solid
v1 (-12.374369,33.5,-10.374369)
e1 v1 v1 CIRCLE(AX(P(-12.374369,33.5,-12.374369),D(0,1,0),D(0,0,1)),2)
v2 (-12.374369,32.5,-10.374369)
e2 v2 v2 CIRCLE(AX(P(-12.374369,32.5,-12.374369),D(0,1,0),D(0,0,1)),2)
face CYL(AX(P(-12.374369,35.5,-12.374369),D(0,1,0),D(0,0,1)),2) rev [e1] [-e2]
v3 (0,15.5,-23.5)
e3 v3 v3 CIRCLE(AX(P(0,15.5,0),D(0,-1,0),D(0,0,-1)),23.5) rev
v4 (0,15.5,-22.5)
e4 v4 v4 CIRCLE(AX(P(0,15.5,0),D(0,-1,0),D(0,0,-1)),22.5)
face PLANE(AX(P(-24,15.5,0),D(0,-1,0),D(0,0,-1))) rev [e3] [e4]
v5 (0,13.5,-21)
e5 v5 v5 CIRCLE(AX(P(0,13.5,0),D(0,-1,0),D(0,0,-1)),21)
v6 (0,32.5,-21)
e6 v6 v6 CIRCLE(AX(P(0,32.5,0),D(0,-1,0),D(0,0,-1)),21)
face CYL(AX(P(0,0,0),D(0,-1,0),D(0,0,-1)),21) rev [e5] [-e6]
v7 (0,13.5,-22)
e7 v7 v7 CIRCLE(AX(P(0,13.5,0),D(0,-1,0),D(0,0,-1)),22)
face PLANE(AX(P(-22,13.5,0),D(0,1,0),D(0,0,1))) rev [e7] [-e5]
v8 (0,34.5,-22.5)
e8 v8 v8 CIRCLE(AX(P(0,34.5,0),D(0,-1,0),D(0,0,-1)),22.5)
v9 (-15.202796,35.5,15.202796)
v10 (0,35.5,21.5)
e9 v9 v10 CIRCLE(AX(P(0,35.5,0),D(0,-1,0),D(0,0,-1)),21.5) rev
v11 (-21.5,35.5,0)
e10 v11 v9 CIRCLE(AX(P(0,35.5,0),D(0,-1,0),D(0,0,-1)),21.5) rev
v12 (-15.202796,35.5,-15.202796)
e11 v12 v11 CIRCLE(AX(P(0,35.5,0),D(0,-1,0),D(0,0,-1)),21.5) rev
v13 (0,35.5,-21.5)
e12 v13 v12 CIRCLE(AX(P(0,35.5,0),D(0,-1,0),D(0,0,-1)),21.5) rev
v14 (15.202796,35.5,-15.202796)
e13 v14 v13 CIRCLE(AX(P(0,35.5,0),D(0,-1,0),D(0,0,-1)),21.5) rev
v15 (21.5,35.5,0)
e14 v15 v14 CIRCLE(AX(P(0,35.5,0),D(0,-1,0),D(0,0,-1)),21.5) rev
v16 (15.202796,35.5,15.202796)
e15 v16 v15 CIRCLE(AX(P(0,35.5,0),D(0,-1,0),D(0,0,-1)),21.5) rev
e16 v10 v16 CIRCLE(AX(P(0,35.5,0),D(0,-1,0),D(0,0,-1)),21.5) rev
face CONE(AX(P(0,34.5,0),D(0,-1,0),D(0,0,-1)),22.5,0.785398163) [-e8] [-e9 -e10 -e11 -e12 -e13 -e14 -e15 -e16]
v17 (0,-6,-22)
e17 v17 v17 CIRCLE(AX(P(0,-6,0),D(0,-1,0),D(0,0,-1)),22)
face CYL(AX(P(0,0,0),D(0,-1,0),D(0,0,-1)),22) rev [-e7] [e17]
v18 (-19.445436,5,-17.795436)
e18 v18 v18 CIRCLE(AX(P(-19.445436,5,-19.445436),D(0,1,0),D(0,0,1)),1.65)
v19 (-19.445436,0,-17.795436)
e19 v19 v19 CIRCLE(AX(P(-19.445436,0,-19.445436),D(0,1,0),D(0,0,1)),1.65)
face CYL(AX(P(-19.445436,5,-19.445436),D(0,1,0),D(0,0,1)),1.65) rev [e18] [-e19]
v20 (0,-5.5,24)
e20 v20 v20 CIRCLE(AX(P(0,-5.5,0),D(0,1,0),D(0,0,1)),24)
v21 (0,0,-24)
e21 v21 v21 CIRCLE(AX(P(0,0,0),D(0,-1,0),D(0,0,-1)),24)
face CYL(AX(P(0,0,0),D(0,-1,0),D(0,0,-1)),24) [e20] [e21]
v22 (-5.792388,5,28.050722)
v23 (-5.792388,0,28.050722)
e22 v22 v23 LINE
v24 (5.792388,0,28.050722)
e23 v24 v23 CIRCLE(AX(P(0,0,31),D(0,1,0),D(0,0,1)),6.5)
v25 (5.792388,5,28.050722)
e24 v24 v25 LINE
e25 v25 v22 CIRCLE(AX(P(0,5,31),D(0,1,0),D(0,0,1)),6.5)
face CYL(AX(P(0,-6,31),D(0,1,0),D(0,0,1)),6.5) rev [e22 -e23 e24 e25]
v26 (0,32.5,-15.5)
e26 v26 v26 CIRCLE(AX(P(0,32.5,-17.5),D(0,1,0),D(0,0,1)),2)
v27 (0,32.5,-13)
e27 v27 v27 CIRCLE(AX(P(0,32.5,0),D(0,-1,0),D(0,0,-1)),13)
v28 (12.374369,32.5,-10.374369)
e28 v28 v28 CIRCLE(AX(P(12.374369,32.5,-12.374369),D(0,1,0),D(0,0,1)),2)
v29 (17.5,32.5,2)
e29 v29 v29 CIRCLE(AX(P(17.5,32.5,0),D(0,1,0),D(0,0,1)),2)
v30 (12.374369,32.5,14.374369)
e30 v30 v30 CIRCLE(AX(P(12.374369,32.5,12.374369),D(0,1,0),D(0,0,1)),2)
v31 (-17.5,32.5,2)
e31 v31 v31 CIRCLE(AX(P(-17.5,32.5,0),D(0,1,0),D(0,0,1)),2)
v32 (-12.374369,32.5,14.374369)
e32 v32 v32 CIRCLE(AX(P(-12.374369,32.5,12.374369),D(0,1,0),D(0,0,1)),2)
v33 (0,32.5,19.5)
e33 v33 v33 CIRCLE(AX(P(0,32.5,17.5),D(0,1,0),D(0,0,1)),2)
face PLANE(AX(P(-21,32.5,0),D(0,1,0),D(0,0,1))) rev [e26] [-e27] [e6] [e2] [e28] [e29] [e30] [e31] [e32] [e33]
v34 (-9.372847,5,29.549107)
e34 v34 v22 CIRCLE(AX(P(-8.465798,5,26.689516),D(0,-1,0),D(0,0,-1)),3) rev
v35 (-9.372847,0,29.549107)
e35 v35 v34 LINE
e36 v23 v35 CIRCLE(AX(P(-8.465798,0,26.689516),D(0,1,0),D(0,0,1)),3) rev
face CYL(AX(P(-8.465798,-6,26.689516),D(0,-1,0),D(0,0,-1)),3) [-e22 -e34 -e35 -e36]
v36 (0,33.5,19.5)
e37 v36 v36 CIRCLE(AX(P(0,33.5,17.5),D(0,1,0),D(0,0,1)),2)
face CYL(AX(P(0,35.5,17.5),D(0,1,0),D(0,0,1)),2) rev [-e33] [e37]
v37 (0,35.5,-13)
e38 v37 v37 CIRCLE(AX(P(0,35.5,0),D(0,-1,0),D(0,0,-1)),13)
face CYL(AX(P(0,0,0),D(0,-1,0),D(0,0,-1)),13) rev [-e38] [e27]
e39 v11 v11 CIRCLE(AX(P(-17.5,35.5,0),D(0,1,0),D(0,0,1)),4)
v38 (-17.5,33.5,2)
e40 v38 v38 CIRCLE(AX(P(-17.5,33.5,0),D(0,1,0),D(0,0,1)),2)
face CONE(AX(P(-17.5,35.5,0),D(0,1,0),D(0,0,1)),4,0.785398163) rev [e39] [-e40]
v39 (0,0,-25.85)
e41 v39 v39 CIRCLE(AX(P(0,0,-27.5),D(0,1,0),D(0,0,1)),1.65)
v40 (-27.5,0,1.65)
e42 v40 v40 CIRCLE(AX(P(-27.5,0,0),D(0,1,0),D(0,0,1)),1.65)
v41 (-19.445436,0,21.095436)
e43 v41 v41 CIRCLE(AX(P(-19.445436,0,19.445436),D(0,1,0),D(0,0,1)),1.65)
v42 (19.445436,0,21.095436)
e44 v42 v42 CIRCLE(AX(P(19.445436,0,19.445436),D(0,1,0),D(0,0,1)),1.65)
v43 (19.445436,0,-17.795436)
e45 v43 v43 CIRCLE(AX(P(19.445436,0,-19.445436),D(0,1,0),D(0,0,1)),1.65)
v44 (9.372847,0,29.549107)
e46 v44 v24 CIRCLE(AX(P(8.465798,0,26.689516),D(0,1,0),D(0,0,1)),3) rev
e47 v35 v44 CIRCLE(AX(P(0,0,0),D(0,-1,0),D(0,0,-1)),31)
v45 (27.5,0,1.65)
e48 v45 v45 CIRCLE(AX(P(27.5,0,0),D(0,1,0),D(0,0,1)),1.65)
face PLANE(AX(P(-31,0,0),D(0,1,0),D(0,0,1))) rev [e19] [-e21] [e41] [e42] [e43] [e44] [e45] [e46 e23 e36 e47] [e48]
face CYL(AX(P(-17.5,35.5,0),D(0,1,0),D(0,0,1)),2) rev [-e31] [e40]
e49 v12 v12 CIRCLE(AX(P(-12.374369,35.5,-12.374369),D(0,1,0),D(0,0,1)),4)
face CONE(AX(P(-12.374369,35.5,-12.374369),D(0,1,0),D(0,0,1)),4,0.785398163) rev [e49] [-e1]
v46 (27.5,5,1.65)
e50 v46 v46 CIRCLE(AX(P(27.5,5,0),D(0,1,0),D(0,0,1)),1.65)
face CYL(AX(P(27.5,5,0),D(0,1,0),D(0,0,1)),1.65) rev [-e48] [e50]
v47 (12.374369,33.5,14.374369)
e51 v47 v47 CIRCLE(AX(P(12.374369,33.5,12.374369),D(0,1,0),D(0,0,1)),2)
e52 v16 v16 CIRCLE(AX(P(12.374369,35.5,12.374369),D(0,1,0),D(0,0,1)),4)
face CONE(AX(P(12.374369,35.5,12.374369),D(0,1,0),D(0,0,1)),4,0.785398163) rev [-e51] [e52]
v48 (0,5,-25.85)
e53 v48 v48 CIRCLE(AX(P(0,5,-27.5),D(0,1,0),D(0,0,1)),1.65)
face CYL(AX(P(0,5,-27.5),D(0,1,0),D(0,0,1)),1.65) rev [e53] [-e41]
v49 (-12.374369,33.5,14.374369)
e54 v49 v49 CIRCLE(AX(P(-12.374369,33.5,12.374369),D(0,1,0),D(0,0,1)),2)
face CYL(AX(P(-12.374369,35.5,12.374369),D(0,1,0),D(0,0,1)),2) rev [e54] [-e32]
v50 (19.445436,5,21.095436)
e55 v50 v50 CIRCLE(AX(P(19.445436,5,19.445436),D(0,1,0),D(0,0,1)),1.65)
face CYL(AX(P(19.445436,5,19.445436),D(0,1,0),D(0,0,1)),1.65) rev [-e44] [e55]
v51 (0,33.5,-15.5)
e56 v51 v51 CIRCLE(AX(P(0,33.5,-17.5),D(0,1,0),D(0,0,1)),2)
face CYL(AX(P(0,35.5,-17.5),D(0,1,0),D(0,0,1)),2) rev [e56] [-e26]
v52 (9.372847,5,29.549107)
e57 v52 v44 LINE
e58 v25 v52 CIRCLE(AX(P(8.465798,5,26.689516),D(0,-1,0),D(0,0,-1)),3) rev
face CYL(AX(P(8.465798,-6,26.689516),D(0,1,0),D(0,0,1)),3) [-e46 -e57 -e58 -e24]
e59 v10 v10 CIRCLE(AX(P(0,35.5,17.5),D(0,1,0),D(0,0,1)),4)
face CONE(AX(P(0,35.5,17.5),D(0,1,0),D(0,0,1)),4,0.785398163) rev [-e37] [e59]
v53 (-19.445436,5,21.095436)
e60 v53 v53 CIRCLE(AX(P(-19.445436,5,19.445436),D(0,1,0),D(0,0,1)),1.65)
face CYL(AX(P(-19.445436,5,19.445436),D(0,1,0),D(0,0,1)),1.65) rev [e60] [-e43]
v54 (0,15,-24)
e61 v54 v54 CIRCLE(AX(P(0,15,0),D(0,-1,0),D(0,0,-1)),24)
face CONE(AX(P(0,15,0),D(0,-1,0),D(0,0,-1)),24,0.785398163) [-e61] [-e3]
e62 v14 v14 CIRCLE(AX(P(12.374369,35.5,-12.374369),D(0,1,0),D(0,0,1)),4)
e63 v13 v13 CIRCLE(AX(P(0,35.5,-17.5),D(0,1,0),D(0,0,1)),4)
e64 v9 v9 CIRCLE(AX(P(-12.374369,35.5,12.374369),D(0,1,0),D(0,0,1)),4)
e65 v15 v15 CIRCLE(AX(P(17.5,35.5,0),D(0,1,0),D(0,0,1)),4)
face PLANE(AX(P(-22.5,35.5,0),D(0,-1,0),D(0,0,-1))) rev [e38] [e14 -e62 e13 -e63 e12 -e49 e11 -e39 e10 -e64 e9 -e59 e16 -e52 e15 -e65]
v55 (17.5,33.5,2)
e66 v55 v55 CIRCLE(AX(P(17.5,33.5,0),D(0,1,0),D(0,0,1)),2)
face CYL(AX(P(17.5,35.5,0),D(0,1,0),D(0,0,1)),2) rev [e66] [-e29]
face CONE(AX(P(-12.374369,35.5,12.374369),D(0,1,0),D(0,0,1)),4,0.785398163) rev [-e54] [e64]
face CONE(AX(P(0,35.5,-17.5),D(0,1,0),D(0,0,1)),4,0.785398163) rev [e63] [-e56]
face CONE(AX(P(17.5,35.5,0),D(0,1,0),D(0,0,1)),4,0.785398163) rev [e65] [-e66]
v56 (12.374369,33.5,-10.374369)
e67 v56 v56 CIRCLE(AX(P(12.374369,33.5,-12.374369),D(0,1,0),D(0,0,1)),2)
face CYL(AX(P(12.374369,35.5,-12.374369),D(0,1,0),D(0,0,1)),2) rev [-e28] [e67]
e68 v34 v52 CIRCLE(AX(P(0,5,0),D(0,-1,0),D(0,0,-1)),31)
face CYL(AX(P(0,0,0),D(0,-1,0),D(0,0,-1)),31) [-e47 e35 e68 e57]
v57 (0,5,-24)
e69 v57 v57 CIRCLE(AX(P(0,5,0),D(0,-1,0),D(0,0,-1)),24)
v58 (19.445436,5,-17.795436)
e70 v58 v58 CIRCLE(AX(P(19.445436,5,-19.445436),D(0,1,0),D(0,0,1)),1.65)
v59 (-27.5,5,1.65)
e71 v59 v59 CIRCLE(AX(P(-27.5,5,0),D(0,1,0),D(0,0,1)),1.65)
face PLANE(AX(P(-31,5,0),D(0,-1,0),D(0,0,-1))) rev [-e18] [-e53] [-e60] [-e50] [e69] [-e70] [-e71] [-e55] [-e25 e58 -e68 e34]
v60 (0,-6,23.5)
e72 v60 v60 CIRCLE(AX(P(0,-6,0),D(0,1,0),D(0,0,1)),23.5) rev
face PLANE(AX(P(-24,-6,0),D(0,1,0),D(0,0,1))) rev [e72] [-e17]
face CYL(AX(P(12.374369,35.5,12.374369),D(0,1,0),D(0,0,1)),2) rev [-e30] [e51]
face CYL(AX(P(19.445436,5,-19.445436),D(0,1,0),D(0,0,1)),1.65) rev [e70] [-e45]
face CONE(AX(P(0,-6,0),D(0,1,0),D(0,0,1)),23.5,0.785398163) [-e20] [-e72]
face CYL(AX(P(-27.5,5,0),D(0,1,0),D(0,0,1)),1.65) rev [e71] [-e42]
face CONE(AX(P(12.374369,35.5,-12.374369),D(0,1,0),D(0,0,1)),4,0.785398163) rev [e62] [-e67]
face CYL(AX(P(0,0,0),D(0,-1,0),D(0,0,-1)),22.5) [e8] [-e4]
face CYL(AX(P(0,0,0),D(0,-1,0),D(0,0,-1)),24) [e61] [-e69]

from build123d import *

# Parameters (mm, degrees)
HOLE_WIZARD_M4_1_D        = 3.3
HOLE_WIZARD_1_D           = 4
HOLE_WIZARD_1_CSINK_D     = 8
HOLE_WIZARD_1_CSINK_ANGLE = 90
CHAMFER_1_SIZE            = 0.5
CHAMFER_2_SIZE            = 1
SKETCH_7_R                = 6.5
CUT_EXTRUDE_1_DEPTH       = 54.406460283
FILLET_1_R                = 3


with BuildPart() as part:
    # 草图1 → 旋转1 (revolve)
    with BuildSketch(Plane.XY, mode=Mode.PRIVATE) as revolve_1_sk:
        Polygon((-22.5, 35.5), (-13, 35.5), (-13, 32.5), (-21, 32.5), (-21, 13.5), (-22, 13.5), (-22, -6), (-24, -6), (-24, 0), (-31, 0), (-31, 5), (-24, 5), (-24, 15.5), (-22.5, 15.5), align=None)
    revolve(revolve_1_sk.sketch.rotate(Axis((0, 0, 0), (0, 1, 0)), 270), axis=Axis((0, 0, 0), (0, 1, 0)))

    # M4 螺纹孔1 (through all)
    with Locations(Plane(origin=(0, 5, 0), x_dir=(1, 0, 0), z_dir=(0, 1, 0))):
        with Locations((-19.445436483, 19.445436483), (0, 27.5), (19.445436483, 19.445436483), (27.5, 0), (19.445436483, -19.445436483), (0, -27.5), (-19.445436483, -19.445436483), (-27.5, 0)):
            Hole(HOLE_WIZARD_M4_1_D / 2)

    # 孔1 (through all)
    with Locations(Plane(origin=(0, 35.5, 0), x_dir=(1, 0, 0), z_dir=(0, 1, 0))):
        with Locations((0, 17.5), (12.374368671, 12.374368671), (17.5, 0), (12.374368671, -12.374368671), (0, -17.5), (-12.374368671, -12.374368671), (-17.5, 0), (-12.374368671, 12.374368671)):
            CounterSinkHole(HOLE_WIZARD_1_D / 2, HOLE_WIZARD_1_CSINK_D / 2, counter_sink_angle=HOLE_WIZARD_1_CSINK_ANGLE)

    # 倒角1
    chamfer_1_edges = [part.edges().sort_by_distance(p)[0] for p in [
        (0, -6, 24),
        (0, 15.5, 24),
    ]]
    chamfer(chamfer_1_edges, length=CHAMFER_1_SIZE)

    # 倒角2
    chamfer_2_edges = [part.edges().sort_by_distance(p)[0] for p in [
        (0, 35.5, 22.5),
    ]]
    chamfer(chamfer_2_edges, length=CHAMFER_2_SIZE - 0.0001)  # a hair under: the kernel refuses the full size

    # 草图7 → 切除-拉伸1 (cut, through all)
    with BuildSketch(Plane(origin=(0, 5, 0), x_dir=(1, 0, 0), z_dir=(0, 1, 0))):
        with Locations((0, -31)):
            Circle(SKETCH_7_R)
    extrude(amount=-CUT_EXTRUDE_1_DEPTH, mode=Mode.SUBTRACT)

    # 圆角1
    fillet_1_edges = [part.edges().sort_by_distance(p)[0] for p in [
        (-6.464180048, 2.5, 30.318548387),
        (6.464180048, 2.5, 30.318548387),
    ]]
    fillet(fillet_1_edges, radius=FILLET_1_R)


solid = part.part
